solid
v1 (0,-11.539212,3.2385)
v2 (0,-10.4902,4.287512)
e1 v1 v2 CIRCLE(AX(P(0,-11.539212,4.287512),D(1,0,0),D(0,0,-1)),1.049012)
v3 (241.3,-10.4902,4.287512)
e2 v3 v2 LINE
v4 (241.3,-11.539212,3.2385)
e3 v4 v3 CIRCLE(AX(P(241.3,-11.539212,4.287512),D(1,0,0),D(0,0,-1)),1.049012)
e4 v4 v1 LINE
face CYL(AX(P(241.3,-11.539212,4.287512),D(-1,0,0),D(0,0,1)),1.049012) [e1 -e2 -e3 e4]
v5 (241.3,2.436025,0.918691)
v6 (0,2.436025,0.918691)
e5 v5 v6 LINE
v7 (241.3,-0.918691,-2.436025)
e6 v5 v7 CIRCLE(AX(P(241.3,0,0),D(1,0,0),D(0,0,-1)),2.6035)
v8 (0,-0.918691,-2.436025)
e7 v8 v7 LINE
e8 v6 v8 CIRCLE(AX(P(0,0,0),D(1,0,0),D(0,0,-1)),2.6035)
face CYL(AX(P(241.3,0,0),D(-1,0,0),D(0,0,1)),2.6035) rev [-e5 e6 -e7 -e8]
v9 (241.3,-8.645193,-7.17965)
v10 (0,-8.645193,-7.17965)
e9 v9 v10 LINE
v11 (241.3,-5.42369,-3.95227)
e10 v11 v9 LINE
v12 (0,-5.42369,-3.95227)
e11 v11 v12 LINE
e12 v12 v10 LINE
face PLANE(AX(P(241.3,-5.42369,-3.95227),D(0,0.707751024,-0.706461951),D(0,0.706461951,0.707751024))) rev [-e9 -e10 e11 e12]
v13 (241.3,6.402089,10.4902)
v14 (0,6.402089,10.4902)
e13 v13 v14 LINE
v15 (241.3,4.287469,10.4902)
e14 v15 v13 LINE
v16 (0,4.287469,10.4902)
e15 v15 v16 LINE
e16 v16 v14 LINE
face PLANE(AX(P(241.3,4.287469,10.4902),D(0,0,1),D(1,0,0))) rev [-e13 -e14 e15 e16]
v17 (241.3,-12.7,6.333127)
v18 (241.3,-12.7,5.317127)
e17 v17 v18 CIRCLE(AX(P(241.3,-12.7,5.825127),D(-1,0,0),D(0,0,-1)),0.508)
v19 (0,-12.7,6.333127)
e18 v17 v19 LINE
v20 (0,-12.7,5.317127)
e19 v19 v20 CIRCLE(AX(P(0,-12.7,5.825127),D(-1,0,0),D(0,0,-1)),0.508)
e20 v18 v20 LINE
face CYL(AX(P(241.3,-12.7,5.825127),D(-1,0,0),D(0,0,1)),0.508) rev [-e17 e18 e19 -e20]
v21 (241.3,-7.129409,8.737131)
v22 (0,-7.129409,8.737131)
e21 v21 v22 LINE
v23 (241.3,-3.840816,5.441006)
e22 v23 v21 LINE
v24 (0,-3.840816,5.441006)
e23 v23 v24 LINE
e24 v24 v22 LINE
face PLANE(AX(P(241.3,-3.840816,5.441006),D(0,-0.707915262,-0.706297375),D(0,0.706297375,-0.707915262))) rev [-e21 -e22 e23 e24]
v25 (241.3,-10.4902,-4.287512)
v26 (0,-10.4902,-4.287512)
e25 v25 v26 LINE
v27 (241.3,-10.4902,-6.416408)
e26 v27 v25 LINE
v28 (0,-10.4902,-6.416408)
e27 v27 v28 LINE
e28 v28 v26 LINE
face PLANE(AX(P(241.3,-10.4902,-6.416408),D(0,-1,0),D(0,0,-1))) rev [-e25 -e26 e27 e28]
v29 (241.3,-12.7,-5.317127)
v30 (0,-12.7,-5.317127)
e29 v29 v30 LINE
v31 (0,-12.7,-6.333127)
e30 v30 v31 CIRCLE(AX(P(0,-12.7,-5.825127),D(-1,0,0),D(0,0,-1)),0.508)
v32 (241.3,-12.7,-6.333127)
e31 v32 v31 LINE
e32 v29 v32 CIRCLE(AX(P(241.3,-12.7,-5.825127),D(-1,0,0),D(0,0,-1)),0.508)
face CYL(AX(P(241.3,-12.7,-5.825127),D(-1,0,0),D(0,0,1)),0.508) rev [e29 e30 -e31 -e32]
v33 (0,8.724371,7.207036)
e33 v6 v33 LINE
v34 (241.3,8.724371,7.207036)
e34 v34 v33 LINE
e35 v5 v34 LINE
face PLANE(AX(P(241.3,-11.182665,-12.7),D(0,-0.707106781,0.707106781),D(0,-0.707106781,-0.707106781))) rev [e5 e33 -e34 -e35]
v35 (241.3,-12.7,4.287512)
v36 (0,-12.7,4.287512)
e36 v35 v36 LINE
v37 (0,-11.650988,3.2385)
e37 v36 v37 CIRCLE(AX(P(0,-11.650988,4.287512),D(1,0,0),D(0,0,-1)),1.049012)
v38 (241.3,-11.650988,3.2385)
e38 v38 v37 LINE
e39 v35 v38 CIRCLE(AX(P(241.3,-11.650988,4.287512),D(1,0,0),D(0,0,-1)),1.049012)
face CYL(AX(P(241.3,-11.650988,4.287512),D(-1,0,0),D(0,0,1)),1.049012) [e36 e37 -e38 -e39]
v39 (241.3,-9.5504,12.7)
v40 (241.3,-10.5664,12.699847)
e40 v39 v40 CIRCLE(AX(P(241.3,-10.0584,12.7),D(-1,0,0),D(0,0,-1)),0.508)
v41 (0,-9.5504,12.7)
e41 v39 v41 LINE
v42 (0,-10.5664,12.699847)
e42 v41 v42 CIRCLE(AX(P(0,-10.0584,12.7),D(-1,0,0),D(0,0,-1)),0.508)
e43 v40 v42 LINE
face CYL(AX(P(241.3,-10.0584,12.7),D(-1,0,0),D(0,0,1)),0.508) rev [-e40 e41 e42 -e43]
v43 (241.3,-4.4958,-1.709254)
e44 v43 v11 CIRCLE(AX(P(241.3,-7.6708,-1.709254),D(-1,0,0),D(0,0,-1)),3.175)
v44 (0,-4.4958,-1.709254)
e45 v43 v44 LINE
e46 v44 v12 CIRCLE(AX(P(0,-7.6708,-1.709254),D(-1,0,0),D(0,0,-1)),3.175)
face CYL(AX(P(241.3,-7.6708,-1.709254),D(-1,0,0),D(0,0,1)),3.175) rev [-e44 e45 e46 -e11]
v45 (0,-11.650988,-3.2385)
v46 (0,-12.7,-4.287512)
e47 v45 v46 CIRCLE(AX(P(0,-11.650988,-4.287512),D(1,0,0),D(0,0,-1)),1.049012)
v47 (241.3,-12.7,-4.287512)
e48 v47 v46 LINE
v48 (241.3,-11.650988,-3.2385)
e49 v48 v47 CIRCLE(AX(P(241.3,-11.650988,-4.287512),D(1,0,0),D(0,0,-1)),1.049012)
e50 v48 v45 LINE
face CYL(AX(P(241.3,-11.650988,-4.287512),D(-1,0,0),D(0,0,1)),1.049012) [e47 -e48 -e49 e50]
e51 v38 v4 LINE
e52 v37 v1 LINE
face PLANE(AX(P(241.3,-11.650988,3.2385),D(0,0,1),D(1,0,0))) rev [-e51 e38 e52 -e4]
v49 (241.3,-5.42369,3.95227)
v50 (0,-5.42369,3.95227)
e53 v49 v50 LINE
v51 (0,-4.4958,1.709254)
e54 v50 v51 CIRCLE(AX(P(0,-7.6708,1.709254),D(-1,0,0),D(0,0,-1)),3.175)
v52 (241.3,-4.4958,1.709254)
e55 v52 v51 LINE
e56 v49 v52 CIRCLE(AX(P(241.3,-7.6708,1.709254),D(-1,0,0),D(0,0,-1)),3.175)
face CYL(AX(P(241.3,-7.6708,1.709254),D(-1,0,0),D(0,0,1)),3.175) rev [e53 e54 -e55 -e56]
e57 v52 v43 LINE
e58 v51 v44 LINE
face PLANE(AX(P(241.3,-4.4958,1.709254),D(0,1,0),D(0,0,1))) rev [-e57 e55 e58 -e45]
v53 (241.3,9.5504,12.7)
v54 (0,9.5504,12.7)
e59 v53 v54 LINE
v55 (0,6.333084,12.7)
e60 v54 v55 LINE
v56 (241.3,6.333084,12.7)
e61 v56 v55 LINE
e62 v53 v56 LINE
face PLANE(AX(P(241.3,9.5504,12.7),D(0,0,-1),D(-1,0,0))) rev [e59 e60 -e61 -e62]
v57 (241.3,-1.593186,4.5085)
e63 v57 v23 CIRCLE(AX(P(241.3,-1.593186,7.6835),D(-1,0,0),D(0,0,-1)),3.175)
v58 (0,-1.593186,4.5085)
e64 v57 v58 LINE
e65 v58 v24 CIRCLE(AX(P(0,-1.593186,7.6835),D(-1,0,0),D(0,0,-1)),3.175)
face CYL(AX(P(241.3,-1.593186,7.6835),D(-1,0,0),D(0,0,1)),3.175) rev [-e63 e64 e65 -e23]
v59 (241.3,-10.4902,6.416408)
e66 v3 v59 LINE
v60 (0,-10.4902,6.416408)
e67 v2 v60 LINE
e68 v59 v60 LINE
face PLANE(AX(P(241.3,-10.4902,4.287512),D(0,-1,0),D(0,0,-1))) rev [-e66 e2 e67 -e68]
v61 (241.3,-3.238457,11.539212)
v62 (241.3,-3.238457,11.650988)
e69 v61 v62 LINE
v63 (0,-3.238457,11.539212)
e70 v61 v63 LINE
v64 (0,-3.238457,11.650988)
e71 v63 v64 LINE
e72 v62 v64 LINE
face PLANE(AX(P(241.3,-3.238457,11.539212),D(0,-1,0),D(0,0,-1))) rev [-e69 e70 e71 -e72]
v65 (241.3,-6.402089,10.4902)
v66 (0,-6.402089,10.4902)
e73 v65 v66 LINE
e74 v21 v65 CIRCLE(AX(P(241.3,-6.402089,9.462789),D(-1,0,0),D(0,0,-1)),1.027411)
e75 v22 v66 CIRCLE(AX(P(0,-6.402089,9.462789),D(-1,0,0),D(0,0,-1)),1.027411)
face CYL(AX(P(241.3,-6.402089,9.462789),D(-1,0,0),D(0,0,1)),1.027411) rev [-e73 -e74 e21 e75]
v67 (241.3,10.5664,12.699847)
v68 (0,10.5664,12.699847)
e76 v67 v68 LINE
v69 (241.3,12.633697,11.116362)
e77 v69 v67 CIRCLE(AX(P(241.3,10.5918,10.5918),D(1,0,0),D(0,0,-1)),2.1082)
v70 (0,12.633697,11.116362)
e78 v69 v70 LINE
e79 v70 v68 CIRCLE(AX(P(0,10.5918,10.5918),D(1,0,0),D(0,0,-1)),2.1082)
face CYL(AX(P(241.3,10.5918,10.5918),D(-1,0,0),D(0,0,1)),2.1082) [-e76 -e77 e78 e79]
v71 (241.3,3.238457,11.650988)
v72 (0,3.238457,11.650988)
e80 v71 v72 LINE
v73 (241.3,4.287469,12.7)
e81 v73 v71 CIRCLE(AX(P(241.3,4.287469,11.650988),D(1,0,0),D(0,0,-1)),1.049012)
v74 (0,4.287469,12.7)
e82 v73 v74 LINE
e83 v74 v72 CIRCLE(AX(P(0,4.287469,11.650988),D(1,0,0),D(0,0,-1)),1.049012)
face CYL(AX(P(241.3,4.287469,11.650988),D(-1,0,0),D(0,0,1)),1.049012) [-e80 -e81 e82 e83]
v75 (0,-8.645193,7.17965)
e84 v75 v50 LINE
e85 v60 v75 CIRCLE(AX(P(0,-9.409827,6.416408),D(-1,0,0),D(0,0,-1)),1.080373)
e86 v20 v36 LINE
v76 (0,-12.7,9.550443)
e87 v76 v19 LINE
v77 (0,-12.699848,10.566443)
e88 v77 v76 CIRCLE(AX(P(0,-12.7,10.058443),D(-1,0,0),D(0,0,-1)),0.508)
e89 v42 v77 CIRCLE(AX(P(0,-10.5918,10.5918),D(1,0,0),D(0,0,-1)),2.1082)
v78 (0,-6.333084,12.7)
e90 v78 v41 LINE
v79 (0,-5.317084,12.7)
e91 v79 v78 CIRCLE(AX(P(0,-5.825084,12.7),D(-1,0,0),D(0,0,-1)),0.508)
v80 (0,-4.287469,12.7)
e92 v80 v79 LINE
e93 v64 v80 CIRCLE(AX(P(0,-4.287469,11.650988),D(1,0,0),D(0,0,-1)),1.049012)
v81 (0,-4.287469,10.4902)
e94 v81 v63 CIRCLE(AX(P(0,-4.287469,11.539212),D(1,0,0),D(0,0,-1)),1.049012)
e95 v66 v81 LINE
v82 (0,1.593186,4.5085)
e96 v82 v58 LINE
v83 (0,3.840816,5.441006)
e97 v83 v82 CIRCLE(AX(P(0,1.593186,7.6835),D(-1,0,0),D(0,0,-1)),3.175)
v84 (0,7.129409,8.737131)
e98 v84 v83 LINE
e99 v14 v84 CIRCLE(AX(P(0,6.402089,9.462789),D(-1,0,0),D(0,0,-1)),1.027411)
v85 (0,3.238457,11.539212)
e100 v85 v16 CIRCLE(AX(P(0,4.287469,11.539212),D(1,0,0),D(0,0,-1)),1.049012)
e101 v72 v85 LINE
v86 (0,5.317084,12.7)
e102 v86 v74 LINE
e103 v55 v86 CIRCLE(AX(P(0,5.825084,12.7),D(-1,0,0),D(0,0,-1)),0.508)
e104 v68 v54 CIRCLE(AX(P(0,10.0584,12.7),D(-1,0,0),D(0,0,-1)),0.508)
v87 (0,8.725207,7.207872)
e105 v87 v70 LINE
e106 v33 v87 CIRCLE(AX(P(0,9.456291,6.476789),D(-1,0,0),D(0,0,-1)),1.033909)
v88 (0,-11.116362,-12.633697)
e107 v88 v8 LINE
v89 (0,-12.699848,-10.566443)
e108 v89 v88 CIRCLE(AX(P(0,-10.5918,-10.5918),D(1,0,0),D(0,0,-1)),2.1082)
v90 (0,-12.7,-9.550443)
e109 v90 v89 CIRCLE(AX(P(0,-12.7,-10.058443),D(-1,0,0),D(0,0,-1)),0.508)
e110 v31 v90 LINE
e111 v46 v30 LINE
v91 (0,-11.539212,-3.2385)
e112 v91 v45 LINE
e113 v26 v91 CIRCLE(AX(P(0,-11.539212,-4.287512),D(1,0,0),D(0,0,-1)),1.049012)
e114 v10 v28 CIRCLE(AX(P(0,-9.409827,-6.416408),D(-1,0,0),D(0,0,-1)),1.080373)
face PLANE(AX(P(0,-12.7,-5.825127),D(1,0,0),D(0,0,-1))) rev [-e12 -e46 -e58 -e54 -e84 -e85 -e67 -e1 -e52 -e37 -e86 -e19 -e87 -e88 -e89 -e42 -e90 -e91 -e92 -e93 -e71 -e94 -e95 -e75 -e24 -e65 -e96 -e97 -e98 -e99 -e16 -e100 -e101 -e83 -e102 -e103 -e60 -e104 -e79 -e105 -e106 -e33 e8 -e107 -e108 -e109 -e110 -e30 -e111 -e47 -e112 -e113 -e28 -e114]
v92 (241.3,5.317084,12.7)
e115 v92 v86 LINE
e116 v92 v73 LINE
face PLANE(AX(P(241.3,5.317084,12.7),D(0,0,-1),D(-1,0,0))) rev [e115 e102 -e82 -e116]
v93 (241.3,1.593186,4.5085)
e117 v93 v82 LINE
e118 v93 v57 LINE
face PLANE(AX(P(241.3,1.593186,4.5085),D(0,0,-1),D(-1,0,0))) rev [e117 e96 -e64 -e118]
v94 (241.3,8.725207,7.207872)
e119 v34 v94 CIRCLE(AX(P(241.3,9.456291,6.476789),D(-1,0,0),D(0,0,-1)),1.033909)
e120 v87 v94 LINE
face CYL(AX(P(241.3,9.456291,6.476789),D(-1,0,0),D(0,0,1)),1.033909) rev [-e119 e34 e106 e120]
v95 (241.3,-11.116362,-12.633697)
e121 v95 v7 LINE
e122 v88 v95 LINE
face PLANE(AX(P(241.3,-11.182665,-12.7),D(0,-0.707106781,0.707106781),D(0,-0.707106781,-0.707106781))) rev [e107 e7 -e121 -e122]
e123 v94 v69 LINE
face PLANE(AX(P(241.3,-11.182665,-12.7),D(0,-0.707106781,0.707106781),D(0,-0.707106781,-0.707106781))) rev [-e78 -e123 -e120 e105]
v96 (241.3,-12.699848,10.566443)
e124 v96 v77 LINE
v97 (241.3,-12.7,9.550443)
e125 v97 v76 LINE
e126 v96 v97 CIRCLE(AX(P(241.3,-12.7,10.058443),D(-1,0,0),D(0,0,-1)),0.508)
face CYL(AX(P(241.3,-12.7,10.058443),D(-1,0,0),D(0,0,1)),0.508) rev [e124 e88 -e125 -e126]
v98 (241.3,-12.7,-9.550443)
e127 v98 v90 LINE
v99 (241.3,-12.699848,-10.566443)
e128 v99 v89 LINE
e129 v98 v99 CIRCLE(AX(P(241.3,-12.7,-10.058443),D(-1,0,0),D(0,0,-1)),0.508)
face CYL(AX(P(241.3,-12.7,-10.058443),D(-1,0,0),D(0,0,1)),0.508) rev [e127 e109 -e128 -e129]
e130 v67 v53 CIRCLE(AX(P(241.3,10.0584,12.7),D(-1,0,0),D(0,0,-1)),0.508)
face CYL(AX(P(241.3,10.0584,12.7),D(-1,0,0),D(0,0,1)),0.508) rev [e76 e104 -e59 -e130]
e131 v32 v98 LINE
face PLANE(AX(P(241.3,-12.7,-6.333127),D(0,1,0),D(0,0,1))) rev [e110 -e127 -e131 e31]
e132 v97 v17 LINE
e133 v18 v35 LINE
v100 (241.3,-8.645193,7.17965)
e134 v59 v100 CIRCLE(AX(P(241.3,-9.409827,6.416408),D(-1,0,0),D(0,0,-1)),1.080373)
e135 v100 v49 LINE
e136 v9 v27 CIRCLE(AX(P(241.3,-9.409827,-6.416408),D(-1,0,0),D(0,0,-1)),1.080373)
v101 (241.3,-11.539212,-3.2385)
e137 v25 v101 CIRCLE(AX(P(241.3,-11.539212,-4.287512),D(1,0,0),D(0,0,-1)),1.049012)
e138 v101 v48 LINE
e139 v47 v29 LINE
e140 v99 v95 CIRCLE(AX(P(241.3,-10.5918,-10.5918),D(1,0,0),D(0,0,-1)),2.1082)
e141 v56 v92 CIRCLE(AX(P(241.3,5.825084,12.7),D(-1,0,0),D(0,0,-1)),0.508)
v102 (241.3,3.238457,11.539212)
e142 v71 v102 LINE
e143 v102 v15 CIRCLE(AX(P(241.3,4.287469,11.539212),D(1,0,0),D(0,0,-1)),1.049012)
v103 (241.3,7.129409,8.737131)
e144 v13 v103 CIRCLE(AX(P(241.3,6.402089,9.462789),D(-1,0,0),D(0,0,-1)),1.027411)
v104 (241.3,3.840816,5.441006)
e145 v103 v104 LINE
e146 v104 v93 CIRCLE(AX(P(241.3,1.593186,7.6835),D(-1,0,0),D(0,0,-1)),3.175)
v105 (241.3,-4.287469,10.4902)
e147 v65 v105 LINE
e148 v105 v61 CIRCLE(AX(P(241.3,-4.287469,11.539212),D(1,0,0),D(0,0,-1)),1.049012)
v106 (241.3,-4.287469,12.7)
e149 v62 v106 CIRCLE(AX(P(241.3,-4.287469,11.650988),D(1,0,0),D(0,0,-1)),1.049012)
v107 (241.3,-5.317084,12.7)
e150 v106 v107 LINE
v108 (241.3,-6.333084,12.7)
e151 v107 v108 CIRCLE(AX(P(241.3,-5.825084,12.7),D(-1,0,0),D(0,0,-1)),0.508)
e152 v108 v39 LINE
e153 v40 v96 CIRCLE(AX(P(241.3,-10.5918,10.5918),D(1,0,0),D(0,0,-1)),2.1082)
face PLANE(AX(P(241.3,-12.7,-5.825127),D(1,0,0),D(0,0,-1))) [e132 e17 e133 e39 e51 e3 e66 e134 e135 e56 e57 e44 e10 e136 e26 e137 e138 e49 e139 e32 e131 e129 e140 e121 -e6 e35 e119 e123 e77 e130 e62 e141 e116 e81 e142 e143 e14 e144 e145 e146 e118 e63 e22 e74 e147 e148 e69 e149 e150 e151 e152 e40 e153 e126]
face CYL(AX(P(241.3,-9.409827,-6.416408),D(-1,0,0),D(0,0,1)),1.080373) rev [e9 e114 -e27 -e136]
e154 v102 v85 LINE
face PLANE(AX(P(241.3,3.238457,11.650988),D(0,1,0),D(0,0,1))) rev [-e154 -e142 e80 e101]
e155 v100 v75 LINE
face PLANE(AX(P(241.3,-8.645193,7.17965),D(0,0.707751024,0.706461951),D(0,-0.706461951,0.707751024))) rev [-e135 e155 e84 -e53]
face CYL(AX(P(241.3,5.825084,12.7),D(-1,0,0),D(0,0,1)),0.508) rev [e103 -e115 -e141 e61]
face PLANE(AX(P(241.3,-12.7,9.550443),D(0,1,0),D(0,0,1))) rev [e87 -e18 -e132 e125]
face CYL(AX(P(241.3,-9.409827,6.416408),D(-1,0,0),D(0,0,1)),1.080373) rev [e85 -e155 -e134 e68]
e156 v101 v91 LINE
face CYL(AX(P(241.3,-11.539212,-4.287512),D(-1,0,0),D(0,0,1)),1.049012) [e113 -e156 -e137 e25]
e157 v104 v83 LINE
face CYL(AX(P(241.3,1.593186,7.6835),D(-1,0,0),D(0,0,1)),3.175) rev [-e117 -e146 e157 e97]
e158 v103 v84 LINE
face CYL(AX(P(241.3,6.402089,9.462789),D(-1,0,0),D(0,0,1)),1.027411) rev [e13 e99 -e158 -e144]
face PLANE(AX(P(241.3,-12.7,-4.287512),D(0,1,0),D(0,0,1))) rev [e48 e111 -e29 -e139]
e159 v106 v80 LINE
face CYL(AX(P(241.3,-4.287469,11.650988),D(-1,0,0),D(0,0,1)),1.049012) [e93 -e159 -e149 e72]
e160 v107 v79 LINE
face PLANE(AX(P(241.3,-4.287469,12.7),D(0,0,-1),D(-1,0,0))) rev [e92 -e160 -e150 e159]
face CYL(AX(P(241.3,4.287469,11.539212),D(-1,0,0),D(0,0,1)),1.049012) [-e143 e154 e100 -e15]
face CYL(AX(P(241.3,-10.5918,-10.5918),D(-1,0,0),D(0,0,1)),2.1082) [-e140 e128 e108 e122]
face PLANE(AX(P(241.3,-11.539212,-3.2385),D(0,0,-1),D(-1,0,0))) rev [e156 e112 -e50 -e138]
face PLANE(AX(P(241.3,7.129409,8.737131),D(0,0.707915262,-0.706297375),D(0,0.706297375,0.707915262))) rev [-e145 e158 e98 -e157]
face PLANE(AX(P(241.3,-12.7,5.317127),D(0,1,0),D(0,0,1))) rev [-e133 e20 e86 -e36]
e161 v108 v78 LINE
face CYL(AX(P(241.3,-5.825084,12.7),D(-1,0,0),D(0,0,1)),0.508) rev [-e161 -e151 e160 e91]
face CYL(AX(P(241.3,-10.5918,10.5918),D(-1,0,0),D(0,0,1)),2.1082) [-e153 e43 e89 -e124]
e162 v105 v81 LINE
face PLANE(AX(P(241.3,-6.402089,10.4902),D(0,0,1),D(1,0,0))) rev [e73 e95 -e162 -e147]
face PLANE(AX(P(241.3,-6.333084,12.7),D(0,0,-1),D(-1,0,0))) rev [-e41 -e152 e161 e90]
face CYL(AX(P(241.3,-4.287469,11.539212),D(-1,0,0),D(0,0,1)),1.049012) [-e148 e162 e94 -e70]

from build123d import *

# Parameters (mm, degrees)
SKETCH1_R           = 2.6035
BOSS_EXTRUDE1_DEPTH = 241.3
CUT_EXTRUDE1_START  = -241.3
CUT_EXTRUDE1_DEPTH  = 241.3


# Read off the part's stored shape, not the designer's step: Cut-Extrude1
with BuildPart() as part:
    # Sketch1 → Boss-Extrude1 (new body)
    with BuildSketch(Plane(origin=(0, 0, 0), x_dir=(0, 0, -1), z_dir=(1, 0, 0))):
        with BuildLine():
            Line((6.333126718, -12.7), (9.550443118, -12.7))
            ThreePointArc((9.550443118, -12.7), (10.058366869, -12.192000006), (10.566443095, -12.699847501))
            ThreePointArc((10.566443095, -12.699847501), (12.082537762, -12.08250727), (12.699846982, -10.566399977))
            ThreePointArc((12.699846982, -10.566399977), (12.192000006, -10.058323491), (12.7, -9.5504))
            Line((12.7, -9.5504), (12.7, -6.3330836))
            ThreePointArc((12.7, -6.3330836), (12.192, -5.8250836), (12.7, -5.3170836))
            Line((12.7, -5.3170836), (12.7, -4.287469289))
            ThreePointArc((12.7, -4.287469289), (12.39275138, -3.545705502), (11.650987593, -3.238456882))
            Line((11.650987593, -3.238456882), (11.539212407, -3.238456882))
            ThreePointArc((11.539212407, -3.238456882), (10.79744862, -3.545705502), (10.4902, -4.287469289))
            Line((10.4902, -4.287469289), (10.4902, -6.402089023))
            ThreePointArc((10.4902, -6.402089023), (9.856505071, -7.351067942), (8.737131347, -7.129408934))
            Line((8.737131347, -7.129408934), (5.441005833, -3.840816462))
            ThreePointArc((5.441005833, -3.840816462), (4.750877967, -2.809883091), (4.5085, -1.593185507))
            Line((4.5085, -1.593185507), (4.5085, 1.593185507))
            ThreePointArc((4.5085, 1.593185507), (4.750877967, 2.809883091), (5.441005833, 3.840816462))
            Line((5.441005833, 3.840816462), (8.737131347, 7.129408934))
            ThreePointArc((8.737131347, 7.129408934), (9.856505071, 7.351067942), (10.4902, 6.402089023))
            Line((10.4902, 6.402089023), (10.4902, 4.287469289))
            ThreePointArc((10.4902, 4.287469289), (10.79744862, 3.545705502), (11.539212407, 3.238456882))
            Line((11.539212407, 3.238456882), (11.650987593, 3.238456882))
            ThreePointArc((11.650987593, 3.238456882), (12.39275138, 3.545705502), (12.7, 4.287469289))
            Line((12.7, 4.287469289), (12.7, 5.3170836))
            ThreePointArc((12.7, 5.3170836), (12.192, 5.8250836), (12.7, 6.3330836))
            Line((12.7, 6.3330836), (12.7, 9.5504))
            ThreePointArc((12.7, 9.5504), (12.192000006, 10.058323491), (12.699846982, 10.566399977))
            ThreePointArc((12.699846982, 10.566399977), (12.082537762, 12.08250727), (10.566443095, 12.699847501))
            ThreePointArc((10.566443095, 12.699847501), (10.058366869, 12.192000006), (9.550443118, 12.7))
            Line((9.550443118, 12.7), (6.333126718, 12.7))
            ThreePointArc((6.333126718, 12.7), (5.825126718, 12.192), (5.317126718, 12.7))
            Line((5.317126718, 12.7), (4.287512407, 12.7))
            ThreePointArc((4.287512407, 12.7), (3.54574862, 12.39275138), (3.2385, 11.650987593))
            Line((3.2385, 11.650987593), (3.2385, 11.539212407))
            ThreePointArc((3.2385, 11.539212407), (3.54574862, 10.79744862), (4.287512407, 10.4902))
            Line((4.287512407, 10.4902), (6.476788598, 10.4902))
            ThreePointArc((6.476788598, 10.4902), (7.432222385, 9.85140422), (7.207036008, 8.724370562))
            Line((7.207036008, 8.724370562), (3.898272566, 5.423169045))
            ThreePointArc((3.898272566, 5.423169045), (2.869120213, 4.736787962), (1.655778399, 4.4958))
            Line((1.655778399, 4.4958), (-1.655778399, 4.4958))
            ThreePointArc((-1.655778399, 4.4958), (-2.869120213, 4.736787962), (-3.898272566, 5.423169045))
            Line((-3.898272566, 5.423169045), (-7.207036008, 8.724370562))
            ThreePointArc((-7.207036008, 8.724370562), (-7.432222385, 9.85140422), (-6.476788598, 10.4902))
            Line((-6.476788598, 10.4902), (-4.287512407, 10.4902))
            ThreePointArc((-4.287512407, 10.4902), (-3.54574862, 10.79744862), (-3.2385, 11.539212407))
            Line((-3.2385, 11.539212407), (-3.2385, 11.650987593))
            ThreePointArc((-3.2385, 11.650987593), (-3.54574862, 12.39275138), (-4.287512407, 12.7))
            Line((-4.287512407, 12.7), (-5.317126718, 12.7))
            ThreePointArc((-5.317126718, 12.7), (-5.825126718, 12.192), (-6.333126718, 12.7))
            Line((-6.333126718, 12.7), (-9.550443118, 12.7))
            ThreePointArc((-9.550443118, 12.7), (-10.058366869, 12.192000006), (-10.566443095, 12.699847501))
            ThreePointArc((-10.566443095, 12.699847501), (-12.082537762, 12.08250727), (-12.699846982, 10.566399977))
            ThreePointArc((-12.699846982, 10.566399977), (-12.192000006, 10.058323491), (-12.7, 9.5504))
            Line((-12.7, 9.5504), (-12.7, 6.3330836))
            ThreePointArc((-12.7, 6.3330836), (-12.192, 5.8250836), (-12.7, 5.3170836))
            Line((-12.7, 5.3170836), (-12.7, 4.287469289))
            ThreePointArc((-12.7, 4.287469289), (-12.39275138, 3.545705502), (-11.650987593, 3.238456882))
            Line((-11.650987593, 3.238456882), (-11.539212407, 3.238456882))
            ThreePointArc((-11.539212407, 3.238456882), (-10.79744862, 3.545705502), (-10.4902, 4.287469289))
            Line((-10.4902, 4.287469289), (-10.4902, 6.402089023))
            ThreePointArc((-10.4902, 6.402089023), (-9.856505071, 7.351067942), (-8.737131347, 7.129408934))
            Line((-8.737131347, 7.129408934), (-5.441005833, 3.840816462))
            ThreePointArc((-5.441005833, 3.840816462), (-4.750877967, 2.809883091), (-4.5085, 1.593185507))
            Line((-4.5085, 1.593185507), (-4.5085, -1.593185507))
            ThreePointArc((-4.5085, -1.593185507), (-4.750877967, -2.809883091), (-5.441005833, -3.840816462))
            Line((-5.441005833, -3.840816462), (-8.737131347, -7.129408934))
            ThreePointArc((-8.737131347, -7.129408934), (-9.856505071, -7.351067942), (-10.4902, -6.402089023))
            Line((-10.4902, -6.402089023), (-10.4902, -4.287469289))
            ThreePointArc((-10.4902, -4.287469289), (-10.79744862, -3.545705502), (-11.539212407, -3.238456882))
            Line((-11.539212407, -3.238456882), (-11.650987593, -3.238456882))
            ThreePointArc((-11.650987593, -3.238456882), (-12.39275138, -3.545705502), (-12.7, -4.287469289))
            Line((-12.7, -4.287469289), (-12.7, -5.3170836))
            ThreePointArc((-12.7, -5.3170836), (-12.192, -5.8250836), (-12.7, -6.3330836))
            Line((-12.7, -6.3330836), (-12.7, -9.5504))
            ThreePointArc((-12.7, -9.5504), (-12.192000006, -10.058323491), (-12.699846982, -10.566399977))
            ThreePointArc((-12.699846982, -10.566399977), (-12.082537762, -12.08250727), (-10.566443095, -12.699847501))
            ThreePointArc((-10.566443095, -12.699847501), (-10.058366869, -12.192000006), (-9.550443118, -12.7))
            Line((-9.550443118, -12.7), (-6.333126718, -12.7))
            ThreePointArc((-6.333126718, -12.7), (-5.825126718, -12.192), (-5.317126718, -12.7))
            Line((-5.317126718, -12.7), (-4.287512407, -12.7))
            ThreePointArc((-4.287512407, -12.7), (-3.54574862, -12.39275138), (-3.2385, -11.650987593))
            Line((-3.2385, -11.650987593), (-3.2385, -11.539212407))
            ThreePointArc((-3.2385, -11.539212407), (-3.54574862, -10.79744862), (-4.287512407, -10.4902))
            Line((-4.287512407, -10.4902), (-6.416408329, -10.4902))
            ThreePointArc((-6.416408329, -10.4902), (-7.41473083, -9.822813117), (-7.179650497, -8.645192506))
            Line((-7.179650497, -8.645192506), (-3.952270251, -5.423690499))
            ThreePointArc((-3.952270251, -5.423690499), (-2.922936451, -4.736929036), (-1.709253557, -4.4958))
            Line((-1.709253557, -4.4958), (1.709253557, -4.4958))
            ThreePointArc((1.709253557, -4.4958), (2.922936451, -4.736929036), (3.952270251, -5.423690499))
            Line((3.952270251, -5.423690499), (7.179650497, -8.645192506))
            ThreePointArc((7.179650497, -8.645192506), (7.41473083, -9.822813117), (6.416408329, -10.4902))
            Line((6.416408329, -10.4902), (4.287512407, -10.4902))
            ThreePointArc((4.287512407, -10.4902), (3.54574862, -10.79744862), (3.2385, -11.539212407))
            Line((3.2385, -11.539212407), (3.2385, -11.650987593))
            ThreePointArc((3.2385, -11.650987593), (3.54574862, -12.39275138), (4.287512407, -12.7))
            Line((4.287512407, -12.7), (5.317126718, -12.7))
            ThreePointArc((5.317126718, -12.7), (5.825126718, -12.192), (6.333126718, -12.7))
        make_face()
        with Locations(Location((0, 0, 0), (0, 0, 180))):
            Circle(SKETCH1_R, mode=Mode.SUBTRACT)
    extrude(amount=BOSS_EXTRUDE1_DEPTH)

    # Cut-Extrude1 outline → Cut-Extrude1 (cut)
    with BuildSketch(Plane.ZY.offset(CUT_EXTRUDE1_START)):
        with BuildLine():
            ThreePointArc((-12.699846982, -10.566399977), (-12.684913132, -10.843563097), (-12.633696634, -11.11636208))
            Line((-12.633696634, -11.11636208), (-2.436025345, -0.918690791))
            ThreePointArc((-2.436025345, -0.918690791), (-1.840952505, 1.840952505), (0.918690791, 2.436025345))
            Line((0.918690791, 2.436025345), (7.207036008, 8.724370562))
            Line((7.207036008, 8.724370562), (3.898272566, 5.423169045))
            ThreePointArc((3.898272566, 5.423169045), (2.869120213, 4.736787962), (1.655778399, 4.4958))
            Line((1.655778399, 4.4958), (-1.655778399, 4.4958))
            ThreePointArc((-1.655778399, 4.4958), (-2.869120213, 4.736787962), (-3.898272566, 5.423169045))
            Line((-3.898272566, 5.423169045), (-7.207036008, 8.724370562))
            ThreePointArc((-7.207036008, 8.724370562), (-7.432222385, 9.85140422), (-6.476788598, 10.4902))
            Line((-6.476788598, 10.4902), (-4.287512407, 10.4902))
            ThreePointArc((-4.287512407, 10.4902), (-3.54574862, 10.79744862), (-3.2385, 11.539212407))
            Line((-3.2385, 11.539212407), (-3.2385, 11.650987593))
            ThreePointArc((-3.2385, 11.650987593), (-3.54574862, 12.39275138), (-4.287512407, 12.7))
            Line((-4.287512407, 12.7), (-5.317126718, 12.7))
            ThreePointArc((-5.317126718, 12.7), (-5.825126718, 12.192), (-6.333126718, 12.7))
            Line((-6.333126718, 12.7), (-9.550443118, 12.7))
            ThreePointArc((-9.550443118, 12.7), (-10.058366868, 12.192000006), (-10.566443095, 12.699847501))
            ThreePointArc((-10.566443095, 12.699847501), (-12.082537762, 12.08250727), (-12.699846982, 10.566399977))
            ThreePointArc((-12.699846982, 10.566399977), (-12.192000006, 10.058323491), (-12.7, 9.5504))
            Line((-12.7, 9.5504), (-12.7, 6.3330836))
            ThreePointArc((-12.7, 6.3330836), (-12.192, 5.8250836), (-12.7, 5.3170836))
            Line((-12.7, 5.3170836), (-12.7, 4.287469289))
            ThreePointArc((-12.7, 4.287469289), (-12.39275138, 3.545705502), (-11.650987593, 3.238456882))
            Line((-11.650987593, 3.238456882), (-11.539212407, 3.238456882))
            ThreePointArc((-11.539212407, 3.238456882), (-10.79744862, 3.545705502), (-10.4902, 4.287469289))
            Line((-10.4902, 4.287469289), (-10.4902, 6.402089023))
            ThreePointArc((-10.4902, 6.402089023), (-9.856505071, 7.351067942), (-8.737131347, 7.129408934))
            Line((-8.737131347, 7.129408934), (-5.441005833, 3.840816462))
            ThreePointArc((-5.441005833, 3.840816462), (-4.750877967, 2.80988309), (-4.5085, 1.593185507))
            Line((-4.5085, 1.593185507), (-4.5085, -1.593185507))
            ThreePointArc((-4.5085, -1.593185507), (-4.750877967, -2.80988309), (-5.441005833, -3.840816462))
            Line((-5.441005833, -3.840816462), (-8.737131347, -7.129408934))
            ThreePointArc((-8.737131347, -7.129408934), (-9.856505071, -7.351067942), (-10.4902, -6.402089023))
            Line((-10.4902, -6.402089023), (-10.4902, -4.287469289))
            ThreePointArc((-10.4902, -4.287469289), (-10.79744862, -3.545705502), (-11.539212407, -3.238456882))
            Line((-11.539212407, -3.238456882), (-11.650987593, -3.238456882))
            ThreePointArc((-11.650987593, -3.238456882), (-12.39275138, -3.545705502), (-12.7, -4.287469289))
            Line((-12.7, -4.287469289), (-12.7, -5.3170836))
            ThreePointArc((-12.7, -5.3170836), (-12.192, -5.8250836), (-12.7, -6.3330836))
            Line((-12.7, -6.3330836), (-12.7, -9.5504))
            ThreePointArc((-12.7, -9.5504), (-12.192000006, -10.058323491), (-12.699846982, -10.566399977))
        make_face()
        with BuildLine():
            ThreePointArc((6.476788598, 10.4902), (7.43199622, 9.851950672), (7.20787286, 8.725206458))
            Line((7.20787286, 8.725206458), (11.11636208, 12.633696634))
            ThreePointArc((11.11636208, 12.633696634), (10.843584503, 12.684910557), (10.566443095, 12.699847501))
            ThreePointArc((10.566443095, 12.699847501), (10.058366868, 12.192000006), (9.550443118, 12.7))
            Line((9.550443118, 12.7), (6.333126718, 12.7))
            ThreePointArc((6.333126718, 12.7), (5.825126718, 12.192), (5.317126718, 12.7))
            Line((5.317126718, 12.7), (4.287512407, 12.7))
            ThreePointArc((4.287512407, 12.7), (3.54574862, 12.39275138), (3.2385, 11.650987593))
            Line((3.2385, 11.650987593), (3.2385, 11.539212407))
            ThreePointArc((3.2385, 11.539212407), (3.54574862, 10.79744862), (4.287512407, 10.4902))
            Line((4.287512407, 10.4902), (6.476788598, 10.4902))
        make_face()
    extrude(amount=CUT_EXTRUDE1_DEPTH, mode=Mode.SUBTRACT)


solid = part.part
